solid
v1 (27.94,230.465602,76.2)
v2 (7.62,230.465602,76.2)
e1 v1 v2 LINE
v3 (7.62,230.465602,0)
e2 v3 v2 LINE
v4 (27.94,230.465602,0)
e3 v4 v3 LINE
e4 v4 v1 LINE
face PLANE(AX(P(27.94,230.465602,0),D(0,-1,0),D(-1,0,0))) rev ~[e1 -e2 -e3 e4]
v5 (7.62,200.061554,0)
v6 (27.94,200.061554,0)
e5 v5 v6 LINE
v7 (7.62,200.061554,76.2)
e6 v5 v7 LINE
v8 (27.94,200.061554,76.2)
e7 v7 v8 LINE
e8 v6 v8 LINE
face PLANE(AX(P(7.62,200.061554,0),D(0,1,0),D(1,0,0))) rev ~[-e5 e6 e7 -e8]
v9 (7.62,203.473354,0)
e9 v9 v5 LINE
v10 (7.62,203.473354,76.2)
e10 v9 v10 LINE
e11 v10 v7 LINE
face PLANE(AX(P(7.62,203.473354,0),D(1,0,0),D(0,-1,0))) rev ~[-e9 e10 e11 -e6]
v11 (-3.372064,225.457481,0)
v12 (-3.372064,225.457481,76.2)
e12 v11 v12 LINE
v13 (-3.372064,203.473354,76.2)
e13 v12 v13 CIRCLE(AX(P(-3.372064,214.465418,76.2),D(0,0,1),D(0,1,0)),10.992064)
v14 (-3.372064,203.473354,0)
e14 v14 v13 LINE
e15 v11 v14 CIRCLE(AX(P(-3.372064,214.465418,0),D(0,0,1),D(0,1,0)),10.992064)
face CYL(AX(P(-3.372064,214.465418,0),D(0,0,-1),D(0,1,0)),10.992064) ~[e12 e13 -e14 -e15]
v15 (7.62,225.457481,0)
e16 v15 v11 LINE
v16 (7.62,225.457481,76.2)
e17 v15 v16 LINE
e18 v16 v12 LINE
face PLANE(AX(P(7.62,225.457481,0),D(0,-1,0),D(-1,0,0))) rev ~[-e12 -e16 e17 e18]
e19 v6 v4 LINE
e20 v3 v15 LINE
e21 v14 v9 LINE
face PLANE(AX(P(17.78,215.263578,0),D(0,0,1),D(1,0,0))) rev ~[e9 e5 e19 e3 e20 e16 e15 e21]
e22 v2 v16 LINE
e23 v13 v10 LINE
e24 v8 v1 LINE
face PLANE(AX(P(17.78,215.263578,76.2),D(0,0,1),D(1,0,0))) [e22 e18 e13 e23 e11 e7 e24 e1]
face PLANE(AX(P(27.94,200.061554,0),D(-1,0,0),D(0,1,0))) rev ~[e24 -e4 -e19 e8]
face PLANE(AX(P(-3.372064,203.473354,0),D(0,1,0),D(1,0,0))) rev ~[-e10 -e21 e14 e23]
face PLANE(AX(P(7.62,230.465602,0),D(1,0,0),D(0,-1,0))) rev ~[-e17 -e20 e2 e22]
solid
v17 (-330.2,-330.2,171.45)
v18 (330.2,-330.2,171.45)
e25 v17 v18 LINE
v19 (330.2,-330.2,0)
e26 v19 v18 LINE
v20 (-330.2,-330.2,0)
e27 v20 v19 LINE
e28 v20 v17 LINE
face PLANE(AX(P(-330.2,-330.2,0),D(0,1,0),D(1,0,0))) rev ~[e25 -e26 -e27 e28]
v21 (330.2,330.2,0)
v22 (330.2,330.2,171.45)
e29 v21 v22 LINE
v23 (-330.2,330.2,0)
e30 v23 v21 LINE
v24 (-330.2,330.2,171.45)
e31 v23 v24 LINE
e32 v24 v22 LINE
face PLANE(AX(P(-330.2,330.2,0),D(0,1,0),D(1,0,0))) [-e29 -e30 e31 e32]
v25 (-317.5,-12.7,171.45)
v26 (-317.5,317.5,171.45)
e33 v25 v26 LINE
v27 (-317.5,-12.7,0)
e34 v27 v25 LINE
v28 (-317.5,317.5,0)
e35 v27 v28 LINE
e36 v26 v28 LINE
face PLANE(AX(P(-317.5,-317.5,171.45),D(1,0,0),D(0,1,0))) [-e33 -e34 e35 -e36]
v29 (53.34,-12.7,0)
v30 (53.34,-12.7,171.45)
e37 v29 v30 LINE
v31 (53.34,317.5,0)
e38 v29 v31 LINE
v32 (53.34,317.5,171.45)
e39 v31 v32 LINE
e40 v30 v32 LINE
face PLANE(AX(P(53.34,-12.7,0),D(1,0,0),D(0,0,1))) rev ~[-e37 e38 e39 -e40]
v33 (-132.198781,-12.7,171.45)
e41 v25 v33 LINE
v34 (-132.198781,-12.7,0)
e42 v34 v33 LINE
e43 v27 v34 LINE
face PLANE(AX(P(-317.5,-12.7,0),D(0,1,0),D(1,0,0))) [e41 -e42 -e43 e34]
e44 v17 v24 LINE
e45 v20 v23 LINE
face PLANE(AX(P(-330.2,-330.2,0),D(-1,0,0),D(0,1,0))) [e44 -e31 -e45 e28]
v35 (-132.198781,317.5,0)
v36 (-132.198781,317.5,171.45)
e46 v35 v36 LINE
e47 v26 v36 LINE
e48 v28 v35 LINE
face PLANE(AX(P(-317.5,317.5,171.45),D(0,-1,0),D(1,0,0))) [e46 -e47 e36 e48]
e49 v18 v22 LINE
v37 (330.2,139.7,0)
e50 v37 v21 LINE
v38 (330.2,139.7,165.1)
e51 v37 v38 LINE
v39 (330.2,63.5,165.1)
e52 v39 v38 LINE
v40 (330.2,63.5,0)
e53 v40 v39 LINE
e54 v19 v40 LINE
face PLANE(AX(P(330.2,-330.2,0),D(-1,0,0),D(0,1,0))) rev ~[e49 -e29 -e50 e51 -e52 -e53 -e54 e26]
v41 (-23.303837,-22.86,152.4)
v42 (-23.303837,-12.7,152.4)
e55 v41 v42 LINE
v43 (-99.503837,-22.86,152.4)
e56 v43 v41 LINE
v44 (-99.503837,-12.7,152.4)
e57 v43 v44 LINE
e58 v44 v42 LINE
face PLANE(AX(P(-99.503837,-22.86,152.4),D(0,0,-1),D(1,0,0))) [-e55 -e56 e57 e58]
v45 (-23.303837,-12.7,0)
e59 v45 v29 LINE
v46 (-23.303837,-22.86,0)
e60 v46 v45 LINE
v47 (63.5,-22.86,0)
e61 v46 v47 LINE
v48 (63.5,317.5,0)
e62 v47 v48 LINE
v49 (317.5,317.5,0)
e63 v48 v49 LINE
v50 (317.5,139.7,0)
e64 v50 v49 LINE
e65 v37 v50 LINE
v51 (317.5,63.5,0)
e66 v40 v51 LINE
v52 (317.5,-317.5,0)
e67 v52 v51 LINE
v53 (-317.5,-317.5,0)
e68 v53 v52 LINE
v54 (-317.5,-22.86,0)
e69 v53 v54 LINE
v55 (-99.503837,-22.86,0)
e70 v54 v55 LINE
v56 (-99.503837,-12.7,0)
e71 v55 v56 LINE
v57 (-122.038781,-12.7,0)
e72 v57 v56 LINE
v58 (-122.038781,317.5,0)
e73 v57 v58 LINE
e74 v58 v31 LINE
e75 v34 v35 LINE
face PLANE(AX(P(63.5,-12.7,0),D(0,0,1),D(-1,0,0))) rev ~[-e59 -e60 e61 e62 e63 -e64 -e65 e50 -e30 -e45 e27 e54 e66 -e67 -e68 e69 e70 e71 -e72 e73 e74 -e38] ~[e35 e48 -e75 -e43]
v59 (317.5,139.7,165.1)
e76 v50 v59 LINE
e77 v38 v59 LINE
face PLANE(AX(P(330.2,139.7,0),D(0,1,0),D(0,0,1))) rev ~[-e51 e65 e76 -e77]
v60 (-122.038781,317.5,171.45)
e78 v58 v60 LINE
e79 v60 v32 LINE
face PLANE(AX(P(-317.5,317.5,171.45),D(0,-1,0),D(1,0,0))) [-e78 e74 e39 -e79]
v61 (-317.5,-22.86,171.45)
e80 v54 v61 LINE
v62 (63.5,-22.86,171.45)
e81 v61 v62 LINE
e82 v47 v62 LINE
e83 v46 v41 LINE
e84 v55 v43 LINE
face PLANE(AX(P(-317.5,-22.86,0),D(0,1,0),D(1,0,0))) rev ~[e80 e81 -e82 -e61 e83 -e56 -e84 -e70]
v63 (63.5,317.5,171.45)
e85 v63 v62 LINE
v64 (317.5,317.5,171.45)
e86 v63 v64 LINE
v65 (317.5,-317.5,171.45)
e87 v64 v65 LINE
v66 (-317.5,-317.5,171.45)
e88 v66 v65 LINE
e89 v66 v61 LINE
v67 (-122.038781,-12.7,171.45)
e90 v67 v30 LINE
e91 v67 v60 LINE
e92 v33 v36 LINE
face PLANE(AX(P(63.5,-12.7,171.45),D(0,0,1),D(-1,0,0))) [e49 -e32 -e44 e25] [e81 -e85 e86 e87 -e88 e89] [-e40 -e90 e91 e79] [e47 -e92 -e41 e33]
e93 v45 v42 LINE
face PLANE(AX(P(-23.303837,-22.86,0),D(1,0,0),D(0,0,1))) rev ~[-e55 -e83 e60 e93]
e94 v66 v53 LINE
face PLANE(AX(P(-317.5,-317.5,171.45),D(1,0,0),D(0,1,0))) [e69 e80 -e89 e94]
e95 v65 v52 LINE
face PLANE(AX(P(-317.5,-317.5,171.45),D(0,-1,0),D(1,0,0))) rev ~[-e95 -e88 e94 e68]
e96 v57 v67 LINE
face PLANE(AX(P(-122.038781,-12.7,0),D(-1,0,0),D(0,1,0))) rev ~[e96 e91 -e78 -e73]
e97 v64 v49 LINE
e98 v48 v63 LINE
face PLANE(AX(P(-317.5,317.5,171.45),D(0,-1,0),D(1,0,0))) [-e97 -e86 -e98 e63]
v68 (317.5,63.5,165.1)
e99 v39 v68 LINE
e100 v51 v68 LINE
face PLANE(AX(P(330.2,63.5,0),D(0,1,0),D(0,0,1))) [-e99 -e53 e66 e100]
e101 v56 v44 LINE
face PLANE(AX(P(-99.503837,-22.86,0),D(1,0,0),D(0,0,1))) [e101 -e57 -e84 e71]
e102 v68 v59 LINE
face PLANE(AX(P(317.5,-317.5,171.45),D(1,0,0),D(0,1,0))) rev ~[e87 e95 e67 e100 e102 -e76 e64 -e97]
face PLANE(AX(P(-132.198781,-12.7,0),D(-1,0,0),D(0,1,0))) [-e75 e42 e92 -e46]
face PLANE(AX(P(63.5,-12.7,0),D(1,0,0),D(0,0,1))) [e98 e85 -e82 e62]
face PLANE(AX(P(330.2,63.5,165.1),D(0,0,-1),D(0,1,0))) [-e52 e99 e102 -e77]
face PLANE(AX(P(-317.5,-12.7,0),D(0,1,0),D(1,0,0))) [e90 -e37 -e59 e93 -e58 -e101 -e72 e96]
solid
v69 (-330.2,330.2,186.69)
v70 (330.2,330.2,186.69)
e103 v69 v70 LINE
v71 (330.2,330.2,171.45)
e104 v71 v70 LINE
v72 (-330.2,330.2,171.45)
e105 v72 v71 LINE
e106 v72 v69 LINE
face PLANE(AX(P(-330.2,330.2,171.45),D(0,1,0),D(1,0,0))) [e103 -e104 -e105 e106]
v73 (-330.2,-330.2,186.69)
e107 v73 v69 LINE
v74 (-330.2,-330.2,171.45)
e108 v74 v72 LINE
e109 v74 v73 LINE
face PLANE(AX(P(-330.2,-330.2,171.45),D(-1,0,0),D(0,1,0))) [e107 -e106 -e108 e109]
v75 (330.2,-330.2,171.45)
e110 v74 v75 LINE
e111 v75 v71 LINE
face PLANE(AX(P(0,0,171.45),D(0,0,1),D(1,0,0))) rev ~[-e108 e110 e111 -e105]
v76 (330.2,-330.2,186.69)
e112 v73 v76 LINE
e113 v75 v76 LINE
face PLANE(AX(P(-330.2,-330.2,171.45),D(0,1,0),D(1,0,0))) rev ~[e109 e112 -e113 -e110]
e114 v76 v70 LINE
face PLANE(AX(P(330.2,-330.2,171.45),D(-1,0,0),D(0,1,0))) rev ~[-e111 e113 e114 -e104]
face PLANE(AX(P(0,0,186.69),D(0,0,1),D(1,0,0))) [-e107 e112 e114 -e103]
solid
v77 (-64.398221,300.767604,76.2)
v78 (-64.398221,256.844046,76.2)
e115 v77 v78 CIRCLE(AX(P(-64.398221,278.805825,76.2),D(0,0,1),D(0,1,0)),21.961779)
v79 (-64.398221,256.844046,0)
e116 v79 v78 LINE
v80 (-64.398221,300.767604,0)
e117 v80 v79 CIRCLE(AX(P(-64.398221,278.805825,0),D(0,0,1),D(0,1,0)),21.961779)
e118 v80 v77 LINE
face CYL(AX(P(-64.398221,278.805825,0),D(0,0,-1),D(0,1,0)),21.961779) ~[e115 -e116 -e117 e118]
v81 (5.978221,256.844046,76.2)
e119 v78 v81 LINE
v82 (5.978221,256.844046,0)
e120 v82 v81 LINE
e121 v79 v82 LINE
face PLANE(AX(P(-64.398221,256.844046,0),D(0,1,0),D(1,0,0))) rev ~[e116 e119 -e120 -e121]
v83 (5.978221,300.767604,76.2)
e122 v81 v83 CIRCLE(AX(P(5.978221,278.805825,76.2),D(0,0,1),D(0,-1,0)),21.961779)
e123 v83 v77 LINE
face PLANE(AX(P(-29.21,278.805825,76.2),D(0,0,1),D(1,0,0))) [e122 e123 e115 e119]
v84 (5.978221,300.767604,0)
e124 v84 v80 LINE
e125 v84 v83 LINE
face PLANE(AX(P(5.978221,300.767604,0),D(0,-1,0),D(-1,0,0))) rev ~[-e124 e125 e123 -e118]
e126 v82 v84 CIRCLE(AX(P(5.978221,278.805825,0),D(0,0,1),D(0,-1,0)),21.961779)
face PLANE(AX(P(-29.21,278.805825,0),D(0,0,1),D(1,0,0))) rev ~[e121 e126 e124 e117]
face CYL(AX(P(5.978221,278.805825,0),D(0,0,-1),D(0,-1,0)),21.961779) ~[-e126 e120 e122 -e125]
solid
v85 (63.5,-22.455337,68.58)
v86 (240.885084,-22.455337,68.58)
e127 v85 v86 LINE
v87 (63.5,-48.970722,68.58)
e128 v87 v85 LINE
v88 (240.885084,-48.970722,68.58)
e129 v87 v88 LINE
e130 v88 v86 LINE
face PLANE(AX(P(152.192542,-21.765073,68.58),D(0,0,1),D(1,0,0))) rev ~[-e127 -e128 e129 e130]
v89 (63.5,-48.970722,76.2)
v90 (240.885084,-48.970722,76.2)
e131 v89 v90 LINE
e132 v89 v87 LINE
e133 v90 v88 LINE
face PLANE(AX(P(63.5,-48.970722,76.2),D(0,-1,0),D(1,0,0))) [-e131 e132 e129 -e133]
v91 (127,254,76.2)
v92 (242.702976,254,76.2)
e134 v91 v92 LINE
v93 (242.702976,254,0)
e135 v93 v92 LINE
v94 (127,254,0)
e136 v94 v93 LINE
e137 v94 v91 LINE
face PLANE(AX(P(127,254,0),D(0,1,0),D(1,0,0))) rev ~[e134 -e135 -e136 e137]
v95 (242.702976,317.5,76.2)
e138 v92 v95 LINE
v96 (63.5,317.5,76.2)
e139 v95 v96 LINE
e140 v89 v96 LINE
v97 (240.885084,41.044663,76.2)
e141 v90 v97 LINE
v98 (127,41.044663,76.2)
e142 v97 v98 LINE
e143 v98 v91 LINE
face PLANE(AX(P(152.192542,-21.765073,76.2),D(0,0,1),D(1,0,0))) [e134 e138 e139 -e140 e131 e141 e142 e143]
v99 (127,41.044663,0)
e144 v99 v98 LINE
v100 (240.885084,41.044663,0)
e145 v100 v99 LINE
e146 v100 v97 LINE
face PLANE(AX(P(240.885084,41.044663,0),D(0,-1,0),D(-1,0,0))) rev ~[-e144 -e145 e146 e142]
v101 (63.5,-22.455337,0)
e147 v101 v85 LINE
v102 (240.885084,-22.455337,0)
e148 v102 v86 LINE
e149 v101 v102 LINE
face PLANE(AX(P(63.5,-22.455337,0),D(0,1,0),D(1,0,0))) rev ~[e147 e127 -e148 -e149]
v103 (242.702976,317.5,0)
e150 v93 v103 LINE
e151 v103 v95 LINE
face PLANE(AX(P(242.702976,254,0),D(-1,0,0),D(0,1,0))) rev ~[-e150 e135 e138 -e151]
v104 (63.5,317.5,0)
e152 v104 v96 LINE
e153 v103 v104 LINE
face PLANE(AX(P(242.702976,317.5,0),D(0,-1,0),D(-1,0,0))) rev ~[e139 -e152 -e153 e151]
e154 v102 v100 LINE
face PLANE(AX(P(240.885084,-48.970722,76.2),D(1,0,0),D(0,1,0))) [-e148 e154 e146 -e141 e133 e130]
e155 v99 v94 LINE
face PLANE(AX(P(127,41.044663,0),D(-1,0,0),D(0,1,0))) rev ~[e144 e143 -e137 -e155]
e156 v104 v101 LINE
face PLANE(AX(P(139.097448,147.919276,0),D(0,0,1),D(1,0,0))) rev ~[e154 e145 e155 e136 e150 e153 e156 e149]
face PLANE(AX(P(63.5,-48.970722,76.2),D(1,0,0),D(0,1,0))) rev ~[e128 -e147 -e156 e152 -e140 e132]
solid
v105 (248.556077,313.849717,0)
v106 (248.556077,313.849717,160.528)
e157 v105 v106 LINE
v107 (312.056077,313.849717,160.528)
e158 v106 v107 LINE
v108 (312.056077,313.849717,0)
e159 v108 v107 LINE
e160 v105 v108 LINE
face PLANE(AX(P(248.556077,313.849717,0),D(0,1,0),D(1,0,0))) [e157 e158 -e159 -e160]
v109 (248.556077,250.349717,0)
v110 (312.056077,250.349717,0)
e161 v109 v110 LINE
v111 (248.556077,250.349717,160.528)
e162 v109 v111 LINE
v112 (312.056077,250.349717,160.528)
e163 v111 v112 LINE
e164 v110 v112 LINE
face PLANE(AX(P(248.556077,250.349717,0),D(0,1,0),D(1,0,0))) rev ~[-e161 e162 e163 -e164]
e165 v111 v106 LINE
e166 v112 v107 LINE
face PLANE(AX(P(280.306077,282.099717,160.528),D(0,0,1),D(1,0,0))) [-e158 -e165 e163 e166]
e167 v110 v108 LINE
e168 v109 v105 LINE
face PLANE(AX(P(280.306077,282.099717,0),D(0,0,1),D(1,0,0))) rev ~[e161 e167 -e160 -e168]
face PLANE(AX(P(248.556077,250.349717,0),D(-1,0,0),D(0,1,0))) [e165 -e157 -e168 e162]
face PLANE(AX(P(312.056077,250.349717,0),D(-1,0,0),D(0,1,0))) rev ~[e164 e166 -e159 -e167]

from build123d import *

# Parameters (mm, degrees)
F0_W      = 660.4
F0_H      = 660.4
F1_DEPTH  = 171.45
F3_W      = 635
F3_H      = 635
F4_DEPTH  = 251.46
F5_W      = 76.2
F5_H      = 165.1
F6_DEPTH  = 12.7
F7_W      = 635
F7_H      = 10.16
F8_DEPTH  = 171.45
F9_W      = 254
F9_H      = 171.45
F10_DEPTH = 10.16
F11_W     = 660.4
F11_H     = 660.4
F12_DEPTH = 15.24
F14_DEPTH = 76.2
F15_W     = 76.2
F15_H     = 152.4
F16_DEPTH = 10.16
F17_W     = 10.16
F17_H     = 171.45
F18_DEPTH = 330.2
F20_DEPTH = 76.2
F21_W     = 63.5
F21_H     = 63.5
F22_DEPTH = 160.528
F23_W     = 10.16
F23_H     = 330.2
F24_DEPTH = 171.45
F25_W     = 177.385084331
F25_H     = 54.4112967327
F26_DEPTH = 7.62


with BuildPart() as f1:
    # F0 (on Top) → F1 (new body)
    with BuildSketch(Plane.XY):
        Rectangle(F0_W, F0_H)
    extrude(amount=F1_DEPTH)

    # F3 (on face) → F4 (cut)
    with BuildSketch(Plane.XY.offset(171.45)):
        Rectangle(F3_W, F3_H)
    extrude(amount=-F4_DEPTH, mode=Mode.SUBTRACT)

    # F5 (on face) → F6 (cut, through all)
    with BuildSketch(Plane.YZ.offset(330.2)):
        with Locations((101.6, 82.55)):
            Rectangle(F5_W, F5_H)
    extrude(amount=-F6_DEPTH, mode=Mode.SUBTRACT)

    # F7 (on face) → F8 (join, through all)
    with BuildSketch(Plane.XY):
        with Locations((0, -17.78)):
            Rectangle(F7_W, F7_H)
    extrude(amount=F8_DEPTH)

    # F9 (on face) → F10 (cut, through all)
    with BuildSketch(Plane.XZ.offset(22.86)):
        with Locations((190.5, 85.725)):
            Rectangle(F9_W, F9_H)
    extrude(amount=-F10_DEPTH, mode=Mode.SUBTRACT)

    # F15 (on face) → F16 (cut, through all)
    with BuildSketch(Plane.XZ.offset(22.86)):
        with Locations((-61.403836852, 76.2)):
            Rectangle(F15_W, F15_H)
    extrude(amount=-F16_DEPTH, mode=Mode.SUBTRACT)

    # F17 (on face) → F18 (join, through all)
    with BuildSketch(Plane(origin=(0, -12.7, 0), x_dir=(-1, 0, 0), z_dir=(0, 1, 0))):
        with Locations((-58.42, 85.725)):
            Rectangle(F17_W, F17_H)
    extrude(amount=F18_DEPTH)

    # F23 (on face) → F24 (join, through all)
    with BuildSketch(Plane.XY):
        with Locations((-127.1187807751, 152.4)):
            Rectangle(F23_W, F23_H)
    extrude(amount=F24_DEPTH)


with BuildPart() as f12:
    # F11 (on face) → F12 (new body)
    with BuildSketch(Plane.XY.offset(171.45)):
        Rectangle(F11_W, F11_H)
    extrude(amount=F12_DEPTH)


with BuildPart() as f14:
    # F13 (on face) → F14 (new body)
    with BuildSketch(Plane.XY):
        with BuildLine():
            Line((5.9782206564, 300.767604221), (-64.3982206564, 300.767604221))
            ThreePointArc((-64.3982206564, 300.767604221), (-86.36, 278.8058248774), (-64.3982206564, 256.8440455338))
            Line((-64.3982206564, 256.8440455338), (5.9782206564, 256.8440455338))
            ThreePointArc((5.9782206564, 256.8440455338), (27.94, 278.8058248774), (5.9782206564, 300.767604221))
        make_face()
    extrude(amount=F14_DEPTH)


with BuildPart() as f14b:
    # F13 (on face) → F14, piece 2 (new body)
    with BuildSketch(Plane.XY):
        Polygon((27.94, 200.0615537474), (27.94, 230.4656018443), (7.62, 230.4656018443), (7.62, 225.4574813614), (7.62, 203.4733542914), (7.62, 200.0615537474), align=None)
        with BuildLine():
            Line((7.62, 203.4733542914), (7.62, 225.4574813614))
            Line((7.62, 225.4574813614), (-3.372063535, 225.4574813614))
            ThreePointArc((-3.372063535, 225.4574813614), (-14.36412707, 214.4654178264), (-3.372063535, 203.4733542914))
            Line((-3.372063535, 203.4733542914), (7.62, 203.4733542914))
        make_face()
    extrude(amount=F14_DEPTH)


with BuildPart() as f20:
    # F19 (on face) → F20 (new body)
    with BuildSketch(Plane.XY):
        Polygon((127, 317.5), (63.5, 317.5), (63.5, 254), (63.5, 41.0446626544), (63.5, -22.4553373456), (127, -22.4553373456), (240.885084331, -22.4553373456), (240.885084331, 41.0446626544), (127, 41.0446626544), (127, 254), (242.7029758692, 254), (242.7029758692, 317.5), align=None)
    extrude(amount=F20_DEPTH)

    # F25 (on face) → F26 (join)
    with BuildSketch(Plane.XY.offset(76.2)):
        with Locations((152.1925421655, -21.7650732957)):
            Rectangle(F25_W, F25_H)
    extrude(amount=-F26_DEPTH)


with BuildPart() as f22:
    # F21 (on face) → F22 (new body)
    with BuildSketch(Plane.XY):
        with Locations((280.3060774803, 282.0997173786)):
            Rectangle(F21_W, F21_H)
    extrude(amount=F22_DEPTH)


solid = Compound([f1.part, f12.part, f14.part, f14b.part, f20.part, f22.part])
